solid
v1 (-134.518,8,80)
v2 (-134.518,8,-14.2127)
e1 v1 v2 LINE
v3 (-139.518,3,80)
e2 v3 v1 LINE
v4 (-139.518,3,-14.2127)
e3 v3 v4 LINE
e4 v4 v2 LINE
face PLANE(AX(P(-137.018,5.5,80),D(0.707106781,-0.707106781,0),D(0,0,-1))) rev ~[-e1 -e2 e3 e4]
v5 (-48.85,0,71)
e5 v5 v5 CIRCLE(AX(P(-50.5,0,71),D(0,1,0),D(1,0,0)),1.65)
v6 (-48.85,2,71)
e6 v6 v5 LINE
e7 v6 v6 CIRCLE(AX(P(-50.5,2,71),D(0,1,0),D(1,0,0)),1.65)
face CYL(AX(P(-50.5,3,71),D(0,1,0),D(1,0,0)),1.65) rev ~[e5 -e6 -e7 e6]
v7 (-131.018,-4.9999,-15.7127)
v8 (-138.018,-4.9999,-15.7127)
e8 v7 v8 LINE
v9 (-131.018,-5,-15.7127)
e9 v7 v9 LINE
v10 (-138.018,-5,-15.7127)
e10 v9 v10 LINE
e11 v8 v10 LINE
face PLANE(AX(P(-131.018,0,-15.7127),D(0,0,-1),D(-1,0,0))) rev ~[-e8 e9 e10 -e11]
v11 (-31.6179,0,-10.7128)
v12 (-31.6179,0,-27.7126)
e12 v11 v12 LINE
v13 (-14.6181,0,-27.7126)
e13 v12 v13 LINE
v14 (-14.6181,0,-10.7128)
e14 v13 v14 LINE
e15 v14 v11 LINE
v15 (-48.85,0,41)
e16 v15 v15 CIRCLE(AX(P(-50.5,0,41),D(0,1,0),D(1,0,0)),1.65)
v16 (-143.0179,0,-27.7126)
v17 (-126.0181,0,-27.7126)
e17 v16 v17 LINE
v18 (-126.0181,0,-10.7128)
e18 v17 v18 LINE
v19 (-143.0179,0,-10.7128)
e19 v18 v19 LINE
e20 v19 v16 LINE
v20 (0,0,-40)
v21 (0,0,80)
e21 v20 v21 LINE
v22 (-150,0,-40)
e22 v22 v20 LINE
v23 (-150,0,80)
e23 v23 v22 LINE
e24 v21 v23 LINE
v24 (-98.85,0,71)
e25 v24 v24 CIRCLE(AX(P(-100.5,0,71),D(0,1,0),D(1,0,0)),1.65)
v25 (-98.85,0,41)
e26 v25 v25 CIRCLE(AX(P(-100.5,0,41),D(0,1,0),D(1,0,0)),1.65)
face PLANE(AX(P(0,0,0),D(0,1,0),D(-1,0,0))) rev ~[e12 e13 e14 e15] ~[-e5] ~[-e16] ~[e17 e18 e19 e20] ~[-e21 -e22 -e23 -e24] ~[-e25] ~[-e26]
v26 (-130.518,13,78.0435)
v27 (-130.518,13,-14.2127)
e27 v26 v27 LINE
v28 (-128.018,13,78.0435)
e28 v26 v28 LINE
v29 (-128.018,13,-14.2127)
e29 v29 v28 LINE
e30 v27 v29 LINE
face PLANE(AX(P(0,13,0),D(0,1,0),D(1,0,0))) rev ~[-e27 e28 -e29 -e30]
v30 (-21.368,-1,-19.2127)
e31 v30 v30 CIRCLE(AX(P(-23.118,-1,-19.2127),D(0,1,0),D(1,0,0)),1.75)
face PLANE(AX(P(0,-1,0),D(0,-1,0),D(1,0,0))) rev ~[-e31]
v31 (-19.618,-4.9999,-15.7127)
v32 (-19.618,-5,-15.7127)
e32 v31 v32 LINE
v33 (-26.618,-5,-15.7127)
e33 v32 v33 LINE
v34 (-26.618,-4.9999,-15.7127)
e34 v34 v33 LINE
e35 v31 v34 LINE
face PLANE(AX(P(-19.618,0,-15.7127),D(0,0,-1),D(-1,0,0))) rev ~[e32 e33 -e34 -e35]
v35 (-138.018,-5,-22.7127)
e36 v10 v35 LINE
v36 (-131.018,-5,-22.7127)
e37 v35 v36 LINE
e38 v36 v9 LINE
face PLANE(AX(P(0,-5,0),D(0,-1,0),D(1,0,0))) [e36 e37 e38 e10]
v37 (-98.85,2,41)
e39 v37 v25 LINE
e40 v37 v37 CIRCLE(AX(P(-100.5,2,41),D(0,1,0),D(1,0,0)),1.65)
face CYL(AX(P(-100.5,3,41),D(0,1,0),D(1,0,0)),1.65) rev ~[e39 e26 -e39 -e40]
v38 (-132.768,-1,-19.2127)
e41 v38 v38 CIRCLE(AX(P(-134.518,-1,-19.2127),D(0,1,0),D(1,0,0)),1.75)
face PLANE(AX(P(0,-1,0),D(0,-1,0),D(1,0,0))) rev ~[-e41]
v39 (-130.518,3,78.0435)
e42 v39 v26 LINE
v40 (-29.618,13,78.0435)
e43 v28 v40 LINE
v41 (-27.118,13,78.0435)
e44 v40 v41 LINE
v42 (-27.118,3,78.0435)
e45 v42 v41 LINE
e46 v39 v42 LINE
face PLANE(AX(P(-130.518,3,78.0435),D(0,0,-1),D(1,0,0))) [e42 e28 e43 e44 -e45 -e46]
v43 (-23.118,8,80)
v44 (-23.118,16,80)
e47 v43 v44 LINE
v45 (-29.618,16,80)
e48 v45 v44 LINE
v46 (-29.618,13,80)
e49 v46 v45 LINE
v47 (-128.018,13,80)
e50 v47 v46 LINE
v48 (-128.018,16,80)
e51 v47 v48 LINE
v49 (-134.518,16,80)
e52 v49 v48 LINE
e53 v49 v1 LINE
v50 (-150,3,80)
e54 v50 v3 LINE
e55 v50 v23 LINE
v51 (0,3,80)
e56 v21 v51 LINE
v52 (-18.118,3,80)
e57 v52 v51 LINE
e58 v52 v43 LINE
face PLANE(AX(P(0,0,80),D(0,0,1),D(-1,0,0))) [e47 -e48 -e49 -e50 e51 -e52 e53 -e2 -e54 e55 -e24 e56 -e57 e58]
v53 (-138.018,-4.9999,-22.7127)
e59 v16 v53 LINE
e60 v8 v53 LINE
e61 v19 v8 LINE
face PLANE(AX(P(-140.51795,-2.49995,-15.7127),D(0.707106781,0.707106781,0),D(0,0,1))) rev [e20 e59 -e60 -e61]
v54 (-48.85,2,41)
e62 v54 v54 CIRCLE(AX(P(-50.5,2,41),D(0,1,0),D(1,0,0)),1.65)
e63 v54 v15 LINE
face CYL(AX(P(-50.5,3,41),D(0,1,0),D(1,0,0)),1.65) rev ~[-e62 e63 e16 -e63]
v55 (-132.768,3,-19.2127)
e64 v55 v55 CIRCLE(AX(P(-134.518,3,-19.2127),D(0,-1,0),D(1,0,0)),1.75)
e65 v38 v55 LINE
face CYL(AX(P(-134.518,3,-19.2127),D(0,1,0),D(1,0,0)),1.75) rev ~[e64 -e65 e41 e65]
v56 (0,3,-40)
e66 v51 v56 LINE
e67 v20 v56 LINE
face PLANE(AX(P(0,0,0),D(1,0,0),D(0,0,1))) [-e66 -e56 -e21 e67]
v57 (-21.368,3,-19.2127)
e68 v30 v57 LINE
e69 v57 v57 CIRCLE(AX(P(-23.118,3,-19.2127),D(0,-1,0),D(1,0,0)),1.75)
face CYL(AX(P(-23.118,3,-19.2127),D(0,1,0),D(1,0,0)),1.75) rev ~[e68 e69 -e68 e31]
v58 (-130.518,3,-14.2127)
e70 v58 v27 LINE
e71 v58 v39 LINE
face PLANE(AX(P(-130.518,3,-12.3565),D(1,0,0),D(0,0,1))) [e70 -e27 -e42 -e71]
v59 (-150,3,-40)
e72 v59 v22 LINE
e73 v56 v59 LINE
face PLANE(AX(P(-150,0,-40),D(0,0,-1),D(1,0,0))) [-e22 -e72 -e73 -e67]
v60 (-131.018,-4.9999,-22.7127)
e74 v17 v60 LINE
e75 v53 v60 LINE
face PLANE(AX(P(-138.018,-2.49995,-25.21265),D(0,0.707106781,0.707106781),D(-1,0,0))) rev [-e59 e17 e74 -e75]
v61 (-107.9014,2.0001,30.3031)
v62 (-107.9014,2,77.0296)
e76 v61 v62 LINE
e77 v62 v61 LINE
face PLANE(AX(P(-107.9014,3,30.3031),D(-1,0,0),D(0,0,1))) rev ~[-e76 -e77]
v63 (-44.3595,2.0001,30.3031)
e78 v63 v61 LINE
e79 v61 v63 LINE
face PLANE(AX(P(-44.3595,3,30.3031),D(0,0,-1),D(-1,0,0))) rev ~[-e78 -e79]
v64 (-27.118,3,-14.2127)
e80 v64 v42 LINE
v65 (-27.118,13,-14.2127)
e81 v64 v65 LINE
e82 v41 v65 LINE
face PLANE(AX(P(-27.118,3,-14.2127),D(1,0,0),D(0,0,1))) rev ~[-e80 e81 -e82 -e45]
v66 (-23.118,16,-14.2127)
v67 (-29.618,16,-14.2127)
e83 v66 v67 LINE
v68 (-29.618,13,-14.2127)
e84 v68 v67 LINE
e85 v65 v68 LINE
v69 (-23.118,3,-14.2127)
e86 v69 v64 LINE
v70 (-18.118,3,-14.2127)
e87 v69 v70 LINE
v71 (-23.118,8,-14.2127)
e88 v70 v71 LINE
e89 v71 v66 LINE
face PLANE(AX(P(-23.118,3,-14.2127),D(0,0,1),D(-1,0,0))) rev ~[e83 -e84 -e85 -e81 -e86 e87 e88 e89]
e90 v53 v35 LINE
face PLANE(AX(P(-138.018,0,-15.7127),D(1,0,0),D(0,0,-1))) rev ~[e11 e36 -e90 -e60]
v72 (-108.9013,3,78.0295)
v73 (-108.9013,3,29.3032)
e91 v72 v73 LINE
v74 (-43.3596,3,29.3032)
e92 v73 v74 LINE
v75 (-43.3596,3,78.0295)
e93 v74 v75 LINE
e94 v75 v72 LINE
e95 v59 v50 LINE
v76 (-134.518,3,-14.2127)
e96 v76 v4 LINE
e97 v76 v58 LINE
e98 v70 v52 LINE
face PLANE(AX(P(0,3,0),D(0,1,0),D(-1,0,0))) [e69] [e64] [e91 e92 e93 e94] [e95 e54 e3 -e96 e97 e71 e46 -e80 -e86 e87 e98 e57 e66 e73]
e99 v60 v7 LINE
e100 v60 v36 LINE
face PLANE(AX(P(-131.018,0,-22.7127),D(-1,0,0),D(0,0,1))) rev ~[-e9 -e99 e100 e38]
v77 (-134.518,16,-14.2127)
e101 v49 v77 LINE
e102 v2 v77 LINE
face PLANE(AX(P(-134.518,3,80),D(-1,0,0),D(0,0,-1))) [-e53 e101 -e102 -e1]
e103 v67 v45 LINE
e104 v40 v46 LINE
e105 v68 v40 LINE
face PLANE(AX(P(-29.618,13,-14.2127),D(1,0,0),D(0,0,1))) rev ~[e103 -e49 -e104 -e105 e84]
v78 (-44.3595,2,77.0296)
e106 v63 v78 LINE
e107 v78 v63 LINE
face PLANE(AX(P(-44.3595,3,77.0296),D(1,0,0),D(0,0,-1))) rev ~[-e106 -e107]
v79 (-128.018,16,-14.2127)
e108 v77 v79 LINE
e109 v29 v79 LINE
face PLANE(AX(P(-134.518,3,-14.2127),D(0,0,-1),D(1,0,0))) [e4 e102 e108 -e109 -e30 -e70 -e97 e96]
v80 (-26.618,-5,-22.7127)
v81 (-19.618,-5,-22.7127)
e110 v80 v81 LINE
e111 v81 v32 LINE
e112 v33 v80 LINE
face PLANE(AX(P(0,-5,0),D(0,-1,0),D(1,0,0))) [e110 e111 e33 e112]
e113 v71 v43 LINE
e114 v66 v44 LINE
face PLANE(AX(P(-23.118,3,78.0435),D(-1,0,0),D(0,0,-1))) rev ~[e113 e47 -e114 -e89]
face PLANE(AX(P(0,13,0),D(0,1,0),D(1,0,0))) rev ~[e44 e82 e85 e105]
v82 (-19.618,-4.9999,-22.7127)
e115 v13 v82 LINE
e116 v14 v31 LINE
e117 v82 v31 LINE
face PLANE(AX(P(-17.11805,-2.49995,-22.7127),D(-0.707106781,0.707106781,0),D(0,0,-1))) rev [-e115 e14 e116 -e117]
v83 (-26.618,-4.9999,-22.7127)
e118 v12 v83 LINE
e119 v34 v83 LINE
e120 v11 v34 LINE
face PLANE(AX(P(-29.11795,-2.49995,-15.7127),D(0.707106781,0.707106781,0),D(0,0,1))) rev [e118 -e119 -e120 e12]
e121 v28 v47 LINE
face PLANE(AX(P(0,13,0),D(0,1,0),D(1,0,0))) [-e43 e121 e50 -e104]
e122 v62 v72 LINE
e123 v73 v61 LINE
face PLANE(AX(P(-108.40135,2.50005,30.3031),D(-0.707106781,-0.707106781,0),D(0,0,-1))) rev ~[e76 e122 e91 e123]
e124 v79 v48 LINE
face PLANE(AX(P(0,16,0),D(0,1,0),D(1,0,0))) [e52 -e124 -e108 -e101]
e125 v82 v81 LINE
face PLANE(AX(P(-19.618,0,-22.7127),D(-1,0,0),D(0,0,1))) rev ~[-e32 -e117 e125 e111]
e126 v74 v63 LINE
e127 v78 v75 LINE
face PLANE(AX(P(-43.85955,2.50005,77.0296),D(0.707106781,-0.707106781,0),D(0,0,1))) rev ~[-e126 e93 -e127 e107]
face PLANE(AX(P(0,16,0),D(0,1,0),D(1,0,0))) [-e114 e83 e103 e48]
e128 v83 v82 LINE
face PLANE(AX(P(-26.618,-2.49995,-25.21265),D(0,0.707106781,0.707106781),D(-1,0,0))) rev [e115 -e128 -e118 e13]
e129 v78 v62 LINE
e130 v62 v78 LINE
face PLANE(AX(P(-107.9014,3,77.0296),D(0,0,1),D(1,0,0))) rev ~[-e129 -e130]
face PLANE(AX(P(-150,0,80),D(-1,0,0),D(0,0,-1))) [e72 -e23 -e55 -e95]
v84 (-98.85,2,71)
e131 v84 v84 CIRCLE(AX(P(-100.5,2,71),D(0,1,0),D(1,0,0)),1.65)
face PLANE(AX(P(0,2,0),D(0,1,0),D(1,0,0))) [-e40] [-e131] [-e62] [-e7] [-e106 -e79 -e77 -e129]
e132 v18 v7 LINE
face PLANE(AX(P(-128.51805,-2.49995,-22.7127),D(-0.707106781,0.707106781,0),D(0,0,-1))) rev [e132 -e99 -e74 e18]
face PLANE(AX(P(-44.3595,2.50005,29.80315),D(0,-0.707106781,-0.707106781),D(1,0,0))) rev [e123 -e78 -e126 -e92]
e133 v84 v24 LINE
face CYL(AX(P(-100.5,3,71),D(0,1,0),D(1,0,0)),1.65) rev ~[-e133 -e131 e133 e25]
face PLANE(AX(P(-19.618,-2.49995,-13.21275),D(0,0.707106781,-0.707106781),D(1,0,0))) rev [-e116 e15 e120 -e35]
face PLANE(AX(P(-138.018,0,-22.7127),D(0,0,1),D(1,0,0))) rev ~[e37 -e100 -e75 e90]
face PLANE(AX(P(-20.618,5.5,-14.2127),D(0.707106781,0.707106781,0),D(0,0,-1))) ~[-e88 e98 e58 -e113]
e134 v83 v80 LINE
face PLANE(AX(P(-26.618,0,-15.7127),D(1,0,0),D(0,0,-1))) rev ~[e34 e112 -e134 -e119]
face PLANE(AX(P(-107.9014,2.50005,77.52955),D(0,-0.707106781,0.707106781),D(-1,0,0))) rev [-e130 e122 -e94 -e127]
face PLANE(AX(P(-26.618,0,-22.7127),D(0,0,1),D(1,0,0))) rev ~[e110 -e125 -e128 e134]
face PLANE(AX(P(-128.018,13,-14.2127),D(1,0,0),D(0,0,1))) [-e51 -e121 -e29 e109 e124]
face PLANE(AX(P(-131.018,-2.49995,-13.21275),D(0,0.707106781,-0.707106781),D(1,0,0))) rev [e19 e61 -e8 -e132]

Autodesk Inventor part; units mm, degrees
ref_plane "YZ Plane" through (0, 0, 0) normal (1, 0, 0) x (0, 1, 0)
ref_plane "XZ Plane" through (0, 0, 0) normal (0, 1, 0) x (-1, 0, 0)
ref_plane "XY Plane" through (0, 0, 0) normal (0, 0, 1) x (1, 0, 0)
sketch "Sketch1" plane through (0, 0, 0) normal (0, 1, 0) x (-1, 0, 0)
  line L0 (0, 80) -> (150, 80)
  line L1 (150, 80) -> (150, 0)
  line L2 (150, 0) -> (0, 0)
  line L3 (0, 0) -> (0, 80)
  point P0 (0, 0)
  dimension "d0" = 150
  dimension "d1" = 80
extrude "Extrusion1" add sketch "Sketch1" along normal blind 3
sketch "Sketch2" plane through (0, 3, 0) normal (0, 1, 0) x (1, 0, 0)
  circle A0 centre (-100.5, -71) radius 1.65
  circle A1 centre (-100.5, -41) radius 1.65
  circle A2 centre (-50.5, -71) radius 1.65
  circle A3 centre (-50.5, -41) radius 1.65
  point P0 (0, 0)
  point P1 (-93.7, -18)
  point P2 (-92, -41)
  point P3 (-92, -71)
  point P4 (-58, -18)
  dimension "d5" = 3.3
  dimension "d6" = 3.3
  dimension "d7" = 3.3
  dimension "d8" = 3.3
extrude "Extrusion2" cut sketch "Sketch2" against normal blind 3
sketch "Sketch3" plane through (0, 3, 0) normal (0, 1, 0) x (1, 0, 0)
  line L0 (-107.9014, -77.0296) -> (-44.3595, -77.0296)
  line L1 (-44.3595, -77.0296) -> (-44.3595, -30.3031)
  line L2 (-44.3595, -30.3031) -> (-107.9014, -30.3031)
  line L3 (-107.9014, -30.3031) -> (-107.9014, -77.0296)
  point P0 (0, 0)
extrude "Extrusion3" cut sketch "Sketch3" against normal blind 1
chamfer "Chamfer1" distance 1 angle 45 4 edges at (-107.9014, 3, 53.6663) (-76.1304, 3, 30.3031) (-44.3595, 3, 53.6663) (-76.1304, 3, 77.0296)
sketch "Sketch4" plane through (0, 3, 0) normal (0, 1, 0) x (1, 0, 0)
  line L0 (-27.118, 12.3565) -> (-130.518, 12.3565)
  line L1 (-130.518, 12.3565) -> (-130.518, -78.0435)
  line L2 (-130.518, -78.0435) -> (-27.118, -78.0435)
  line L3 (-27.118, -78.0435) -> (-27.118, 12.3565)
  line L4 (-27.118, -78.0435) -> (-23.118, -78.0435)
  line L5 (-23.118, -78.0435) -> (-23.118, 14.2127)
  line L6 (-23.118, 14.2127) -> (-27.118, 14.2127)
  line L7 (-27.118, 14.2127) -> (-27.118, -78.0435)
  line L8 (-130.518, -78.0435) -> (-134.518, -78.0435)
  line L9 (-134.518, -78.0435) -> (-134.518, 14.2127)
  line L10 (-134.518, 14.2127) -> (-130.518, 14.2127)
  line L11 (-130.518, 14.2127) -> (-130.518, -78.0435)
  line L12 (-150, -80) -> (0, -80) projected
  line L13 (-134.518, -78.0435) -> (-23.118, -78.0435)
  line L14 (-23.118, -78.0435) -> (-23.118, -80)
  line L15 (-23.118, -80) -> (-134.518, -80)
  line L16 (-134.518, -80) -> (-134.518, -78.0435)
  point P0 (0, 0)
  dimension "d16" = 103.4
  dimension "d17" = 90.4
  dimension "d21" = 4
  dimension "d22" = 4
move faces "Move1" translate (0, 0, -40) faces at (-50, 1, 0)
extrude "Extrusion4" add sketch "Sketch4" along normal blind 10 contours L7 L6 L5 L4 L3 | L1 L8 L9 L10 L11 | L4 L14 L12 L16 L8 L2
sketch "Sketch5" plane through (0, 13, 0) normal (0, 1, 0) x (1, 0, 0)
  line L0 (-23.118, 14.2127) -> (-23.118, -80) projected
  line L1 (-134.518, -80) -> (-23.118, -80) projected
  line L2 (-23.118, 14.2127) -> (-29.618, 14.2127)
  line L3 (-29.618, 14.2127) -> (-29.618, -80)
  line L4 (-29.618, -80) -> (-23.118, -80)
  line L5 (-23.118, -80) -> (-23.118, 14.2127)
  line L6 (-134.518, 14.2127) -> (-128.018, 14.2127)
  line L7 (-128.018, 14.2127) -> (-128.018, -80)
  line L8 (-128.018, -80) -> (-134.518, -80)
  line L9 (-134.518, -80) -> (-134.518, 14.2127)
  point P0 (0, 0)
  point P1 (-27.118, 14.2127)
  point P2 (-27.118, -78.0435)
  point P3 (-130.518, 14.2127)
  point P4 (-130.518, -78.0435)
  dimension "d25" = 6.5
  dimension "d26" = 6.5
extrude "Extrusion5" add sketch "Sketch5" along normal blind 3
sketch "Sketch6" plane through (0, 3, 0) normal (0, 1, 0) x (1, 0, 0)
  line L0 (-27.118, 14.2127) -> (-23.118, 14.2127) projected
  line L1 (-23.118, 14.2127) -> (-134.518, 14.2127)
  line L2 (-134.518, 14.2127) -> (-134.518, 19.2127)
  line L3 (-134.518, 19.2127) -> (-23.118, 19.2127)
  line L4 (-23.118, 19.2127) -> (-23.118, 14.2127)
  circle A0 centre (-134.518, 19.2127) radius 1.75
  circle A1 centre (-23.118, 19.2127) radius 1.75
  point P0 (0, 0)
  dimension "d29" = 5
  dimension "d30" = 3.5
  dimension "d31" = 3.5
extrude "Extrusion6" cut sketch "Sketch6" against normal blind 3 contours A1 L3 L4 | L4 L3 A1 | A0 L3 L2 | L2 L3 A0
sketch "Sketch7" plane through (0, 0, 0) normal (0, -1, 0) x (1, 0, 0)
  line L0 (-26.618, -22.7127) -> (-19.618, -22.7127)
  line L1 (-19.618, -22.7127) -> (-19.618, -15.7127)
  line L2 (-19.618, -15.7127) -> (-26.618, -15.7127)
  line L3 (-26.618, -15.7127) -> (-26.618, -22.7127)
  circle A0 centre (-23.118, -19.2127) radius 1.75 projected
  line L4 (-26.618, -22.7127) -> (-19.618, -15.7127) construction
  line L5 (-19.618, -22.7127) -> (-26.618, -15.7127) construction
  line L6 (-138.018, -22.7127) -> (-131.018, -22.7127)
  line L7 (-131.018, -22.7127) -> (-131.018, -15.7127)
  line L8 (-131.018, -15.7127) -> (-138.018, -15.7127)
  line L9 (-138.018, -15.7127) -> (-138.018, -22.7127)
  circle A1 centre (-134.518, -19.2127) radius 1.75 projected
  line L10 (-138.018, -22.7127) -> (-131.018, -15.7127) construction
  line L11 (-131.018, -22.7127) -> (-138.018, -15.7127) construction
  point P0 (0, 0)
  dimension "d34" = 7
  dimension "d35" = 7
  dimension "d36" = 7
  dimension "d37" = 7
extrude "Extrusion7" add sketch "Sketch7" along normal blind 5 contours L3 L2 L1 L0 | A0 | L9 L8 L7 L6 | A1
move faces "Move2" translate (0, -1, 0) faces at (-23.1883, 0, -18.7009) (-133.6676, 0, -18.8259)
chamfer "Chamfer2" distance 5 angle 45 8 edges at (-134.518, 0, -15.7127) (-138.018, 0, -19.2127) (-134.518, 0, -22.7127) (-131.018, 0, -19.2127) (-23.118, 0, -22.7127) (-26.618, 0, -19.2127) (-23.118, 0, -15.7127) (-19.618, 0, -19.2127)
chamfer "Chamfer3" distance 5 angle 45 2 edges at (-134.518, 3, 32.8937) (-23.118, 3, 32.8937)
properties part number "TOPLeft"
